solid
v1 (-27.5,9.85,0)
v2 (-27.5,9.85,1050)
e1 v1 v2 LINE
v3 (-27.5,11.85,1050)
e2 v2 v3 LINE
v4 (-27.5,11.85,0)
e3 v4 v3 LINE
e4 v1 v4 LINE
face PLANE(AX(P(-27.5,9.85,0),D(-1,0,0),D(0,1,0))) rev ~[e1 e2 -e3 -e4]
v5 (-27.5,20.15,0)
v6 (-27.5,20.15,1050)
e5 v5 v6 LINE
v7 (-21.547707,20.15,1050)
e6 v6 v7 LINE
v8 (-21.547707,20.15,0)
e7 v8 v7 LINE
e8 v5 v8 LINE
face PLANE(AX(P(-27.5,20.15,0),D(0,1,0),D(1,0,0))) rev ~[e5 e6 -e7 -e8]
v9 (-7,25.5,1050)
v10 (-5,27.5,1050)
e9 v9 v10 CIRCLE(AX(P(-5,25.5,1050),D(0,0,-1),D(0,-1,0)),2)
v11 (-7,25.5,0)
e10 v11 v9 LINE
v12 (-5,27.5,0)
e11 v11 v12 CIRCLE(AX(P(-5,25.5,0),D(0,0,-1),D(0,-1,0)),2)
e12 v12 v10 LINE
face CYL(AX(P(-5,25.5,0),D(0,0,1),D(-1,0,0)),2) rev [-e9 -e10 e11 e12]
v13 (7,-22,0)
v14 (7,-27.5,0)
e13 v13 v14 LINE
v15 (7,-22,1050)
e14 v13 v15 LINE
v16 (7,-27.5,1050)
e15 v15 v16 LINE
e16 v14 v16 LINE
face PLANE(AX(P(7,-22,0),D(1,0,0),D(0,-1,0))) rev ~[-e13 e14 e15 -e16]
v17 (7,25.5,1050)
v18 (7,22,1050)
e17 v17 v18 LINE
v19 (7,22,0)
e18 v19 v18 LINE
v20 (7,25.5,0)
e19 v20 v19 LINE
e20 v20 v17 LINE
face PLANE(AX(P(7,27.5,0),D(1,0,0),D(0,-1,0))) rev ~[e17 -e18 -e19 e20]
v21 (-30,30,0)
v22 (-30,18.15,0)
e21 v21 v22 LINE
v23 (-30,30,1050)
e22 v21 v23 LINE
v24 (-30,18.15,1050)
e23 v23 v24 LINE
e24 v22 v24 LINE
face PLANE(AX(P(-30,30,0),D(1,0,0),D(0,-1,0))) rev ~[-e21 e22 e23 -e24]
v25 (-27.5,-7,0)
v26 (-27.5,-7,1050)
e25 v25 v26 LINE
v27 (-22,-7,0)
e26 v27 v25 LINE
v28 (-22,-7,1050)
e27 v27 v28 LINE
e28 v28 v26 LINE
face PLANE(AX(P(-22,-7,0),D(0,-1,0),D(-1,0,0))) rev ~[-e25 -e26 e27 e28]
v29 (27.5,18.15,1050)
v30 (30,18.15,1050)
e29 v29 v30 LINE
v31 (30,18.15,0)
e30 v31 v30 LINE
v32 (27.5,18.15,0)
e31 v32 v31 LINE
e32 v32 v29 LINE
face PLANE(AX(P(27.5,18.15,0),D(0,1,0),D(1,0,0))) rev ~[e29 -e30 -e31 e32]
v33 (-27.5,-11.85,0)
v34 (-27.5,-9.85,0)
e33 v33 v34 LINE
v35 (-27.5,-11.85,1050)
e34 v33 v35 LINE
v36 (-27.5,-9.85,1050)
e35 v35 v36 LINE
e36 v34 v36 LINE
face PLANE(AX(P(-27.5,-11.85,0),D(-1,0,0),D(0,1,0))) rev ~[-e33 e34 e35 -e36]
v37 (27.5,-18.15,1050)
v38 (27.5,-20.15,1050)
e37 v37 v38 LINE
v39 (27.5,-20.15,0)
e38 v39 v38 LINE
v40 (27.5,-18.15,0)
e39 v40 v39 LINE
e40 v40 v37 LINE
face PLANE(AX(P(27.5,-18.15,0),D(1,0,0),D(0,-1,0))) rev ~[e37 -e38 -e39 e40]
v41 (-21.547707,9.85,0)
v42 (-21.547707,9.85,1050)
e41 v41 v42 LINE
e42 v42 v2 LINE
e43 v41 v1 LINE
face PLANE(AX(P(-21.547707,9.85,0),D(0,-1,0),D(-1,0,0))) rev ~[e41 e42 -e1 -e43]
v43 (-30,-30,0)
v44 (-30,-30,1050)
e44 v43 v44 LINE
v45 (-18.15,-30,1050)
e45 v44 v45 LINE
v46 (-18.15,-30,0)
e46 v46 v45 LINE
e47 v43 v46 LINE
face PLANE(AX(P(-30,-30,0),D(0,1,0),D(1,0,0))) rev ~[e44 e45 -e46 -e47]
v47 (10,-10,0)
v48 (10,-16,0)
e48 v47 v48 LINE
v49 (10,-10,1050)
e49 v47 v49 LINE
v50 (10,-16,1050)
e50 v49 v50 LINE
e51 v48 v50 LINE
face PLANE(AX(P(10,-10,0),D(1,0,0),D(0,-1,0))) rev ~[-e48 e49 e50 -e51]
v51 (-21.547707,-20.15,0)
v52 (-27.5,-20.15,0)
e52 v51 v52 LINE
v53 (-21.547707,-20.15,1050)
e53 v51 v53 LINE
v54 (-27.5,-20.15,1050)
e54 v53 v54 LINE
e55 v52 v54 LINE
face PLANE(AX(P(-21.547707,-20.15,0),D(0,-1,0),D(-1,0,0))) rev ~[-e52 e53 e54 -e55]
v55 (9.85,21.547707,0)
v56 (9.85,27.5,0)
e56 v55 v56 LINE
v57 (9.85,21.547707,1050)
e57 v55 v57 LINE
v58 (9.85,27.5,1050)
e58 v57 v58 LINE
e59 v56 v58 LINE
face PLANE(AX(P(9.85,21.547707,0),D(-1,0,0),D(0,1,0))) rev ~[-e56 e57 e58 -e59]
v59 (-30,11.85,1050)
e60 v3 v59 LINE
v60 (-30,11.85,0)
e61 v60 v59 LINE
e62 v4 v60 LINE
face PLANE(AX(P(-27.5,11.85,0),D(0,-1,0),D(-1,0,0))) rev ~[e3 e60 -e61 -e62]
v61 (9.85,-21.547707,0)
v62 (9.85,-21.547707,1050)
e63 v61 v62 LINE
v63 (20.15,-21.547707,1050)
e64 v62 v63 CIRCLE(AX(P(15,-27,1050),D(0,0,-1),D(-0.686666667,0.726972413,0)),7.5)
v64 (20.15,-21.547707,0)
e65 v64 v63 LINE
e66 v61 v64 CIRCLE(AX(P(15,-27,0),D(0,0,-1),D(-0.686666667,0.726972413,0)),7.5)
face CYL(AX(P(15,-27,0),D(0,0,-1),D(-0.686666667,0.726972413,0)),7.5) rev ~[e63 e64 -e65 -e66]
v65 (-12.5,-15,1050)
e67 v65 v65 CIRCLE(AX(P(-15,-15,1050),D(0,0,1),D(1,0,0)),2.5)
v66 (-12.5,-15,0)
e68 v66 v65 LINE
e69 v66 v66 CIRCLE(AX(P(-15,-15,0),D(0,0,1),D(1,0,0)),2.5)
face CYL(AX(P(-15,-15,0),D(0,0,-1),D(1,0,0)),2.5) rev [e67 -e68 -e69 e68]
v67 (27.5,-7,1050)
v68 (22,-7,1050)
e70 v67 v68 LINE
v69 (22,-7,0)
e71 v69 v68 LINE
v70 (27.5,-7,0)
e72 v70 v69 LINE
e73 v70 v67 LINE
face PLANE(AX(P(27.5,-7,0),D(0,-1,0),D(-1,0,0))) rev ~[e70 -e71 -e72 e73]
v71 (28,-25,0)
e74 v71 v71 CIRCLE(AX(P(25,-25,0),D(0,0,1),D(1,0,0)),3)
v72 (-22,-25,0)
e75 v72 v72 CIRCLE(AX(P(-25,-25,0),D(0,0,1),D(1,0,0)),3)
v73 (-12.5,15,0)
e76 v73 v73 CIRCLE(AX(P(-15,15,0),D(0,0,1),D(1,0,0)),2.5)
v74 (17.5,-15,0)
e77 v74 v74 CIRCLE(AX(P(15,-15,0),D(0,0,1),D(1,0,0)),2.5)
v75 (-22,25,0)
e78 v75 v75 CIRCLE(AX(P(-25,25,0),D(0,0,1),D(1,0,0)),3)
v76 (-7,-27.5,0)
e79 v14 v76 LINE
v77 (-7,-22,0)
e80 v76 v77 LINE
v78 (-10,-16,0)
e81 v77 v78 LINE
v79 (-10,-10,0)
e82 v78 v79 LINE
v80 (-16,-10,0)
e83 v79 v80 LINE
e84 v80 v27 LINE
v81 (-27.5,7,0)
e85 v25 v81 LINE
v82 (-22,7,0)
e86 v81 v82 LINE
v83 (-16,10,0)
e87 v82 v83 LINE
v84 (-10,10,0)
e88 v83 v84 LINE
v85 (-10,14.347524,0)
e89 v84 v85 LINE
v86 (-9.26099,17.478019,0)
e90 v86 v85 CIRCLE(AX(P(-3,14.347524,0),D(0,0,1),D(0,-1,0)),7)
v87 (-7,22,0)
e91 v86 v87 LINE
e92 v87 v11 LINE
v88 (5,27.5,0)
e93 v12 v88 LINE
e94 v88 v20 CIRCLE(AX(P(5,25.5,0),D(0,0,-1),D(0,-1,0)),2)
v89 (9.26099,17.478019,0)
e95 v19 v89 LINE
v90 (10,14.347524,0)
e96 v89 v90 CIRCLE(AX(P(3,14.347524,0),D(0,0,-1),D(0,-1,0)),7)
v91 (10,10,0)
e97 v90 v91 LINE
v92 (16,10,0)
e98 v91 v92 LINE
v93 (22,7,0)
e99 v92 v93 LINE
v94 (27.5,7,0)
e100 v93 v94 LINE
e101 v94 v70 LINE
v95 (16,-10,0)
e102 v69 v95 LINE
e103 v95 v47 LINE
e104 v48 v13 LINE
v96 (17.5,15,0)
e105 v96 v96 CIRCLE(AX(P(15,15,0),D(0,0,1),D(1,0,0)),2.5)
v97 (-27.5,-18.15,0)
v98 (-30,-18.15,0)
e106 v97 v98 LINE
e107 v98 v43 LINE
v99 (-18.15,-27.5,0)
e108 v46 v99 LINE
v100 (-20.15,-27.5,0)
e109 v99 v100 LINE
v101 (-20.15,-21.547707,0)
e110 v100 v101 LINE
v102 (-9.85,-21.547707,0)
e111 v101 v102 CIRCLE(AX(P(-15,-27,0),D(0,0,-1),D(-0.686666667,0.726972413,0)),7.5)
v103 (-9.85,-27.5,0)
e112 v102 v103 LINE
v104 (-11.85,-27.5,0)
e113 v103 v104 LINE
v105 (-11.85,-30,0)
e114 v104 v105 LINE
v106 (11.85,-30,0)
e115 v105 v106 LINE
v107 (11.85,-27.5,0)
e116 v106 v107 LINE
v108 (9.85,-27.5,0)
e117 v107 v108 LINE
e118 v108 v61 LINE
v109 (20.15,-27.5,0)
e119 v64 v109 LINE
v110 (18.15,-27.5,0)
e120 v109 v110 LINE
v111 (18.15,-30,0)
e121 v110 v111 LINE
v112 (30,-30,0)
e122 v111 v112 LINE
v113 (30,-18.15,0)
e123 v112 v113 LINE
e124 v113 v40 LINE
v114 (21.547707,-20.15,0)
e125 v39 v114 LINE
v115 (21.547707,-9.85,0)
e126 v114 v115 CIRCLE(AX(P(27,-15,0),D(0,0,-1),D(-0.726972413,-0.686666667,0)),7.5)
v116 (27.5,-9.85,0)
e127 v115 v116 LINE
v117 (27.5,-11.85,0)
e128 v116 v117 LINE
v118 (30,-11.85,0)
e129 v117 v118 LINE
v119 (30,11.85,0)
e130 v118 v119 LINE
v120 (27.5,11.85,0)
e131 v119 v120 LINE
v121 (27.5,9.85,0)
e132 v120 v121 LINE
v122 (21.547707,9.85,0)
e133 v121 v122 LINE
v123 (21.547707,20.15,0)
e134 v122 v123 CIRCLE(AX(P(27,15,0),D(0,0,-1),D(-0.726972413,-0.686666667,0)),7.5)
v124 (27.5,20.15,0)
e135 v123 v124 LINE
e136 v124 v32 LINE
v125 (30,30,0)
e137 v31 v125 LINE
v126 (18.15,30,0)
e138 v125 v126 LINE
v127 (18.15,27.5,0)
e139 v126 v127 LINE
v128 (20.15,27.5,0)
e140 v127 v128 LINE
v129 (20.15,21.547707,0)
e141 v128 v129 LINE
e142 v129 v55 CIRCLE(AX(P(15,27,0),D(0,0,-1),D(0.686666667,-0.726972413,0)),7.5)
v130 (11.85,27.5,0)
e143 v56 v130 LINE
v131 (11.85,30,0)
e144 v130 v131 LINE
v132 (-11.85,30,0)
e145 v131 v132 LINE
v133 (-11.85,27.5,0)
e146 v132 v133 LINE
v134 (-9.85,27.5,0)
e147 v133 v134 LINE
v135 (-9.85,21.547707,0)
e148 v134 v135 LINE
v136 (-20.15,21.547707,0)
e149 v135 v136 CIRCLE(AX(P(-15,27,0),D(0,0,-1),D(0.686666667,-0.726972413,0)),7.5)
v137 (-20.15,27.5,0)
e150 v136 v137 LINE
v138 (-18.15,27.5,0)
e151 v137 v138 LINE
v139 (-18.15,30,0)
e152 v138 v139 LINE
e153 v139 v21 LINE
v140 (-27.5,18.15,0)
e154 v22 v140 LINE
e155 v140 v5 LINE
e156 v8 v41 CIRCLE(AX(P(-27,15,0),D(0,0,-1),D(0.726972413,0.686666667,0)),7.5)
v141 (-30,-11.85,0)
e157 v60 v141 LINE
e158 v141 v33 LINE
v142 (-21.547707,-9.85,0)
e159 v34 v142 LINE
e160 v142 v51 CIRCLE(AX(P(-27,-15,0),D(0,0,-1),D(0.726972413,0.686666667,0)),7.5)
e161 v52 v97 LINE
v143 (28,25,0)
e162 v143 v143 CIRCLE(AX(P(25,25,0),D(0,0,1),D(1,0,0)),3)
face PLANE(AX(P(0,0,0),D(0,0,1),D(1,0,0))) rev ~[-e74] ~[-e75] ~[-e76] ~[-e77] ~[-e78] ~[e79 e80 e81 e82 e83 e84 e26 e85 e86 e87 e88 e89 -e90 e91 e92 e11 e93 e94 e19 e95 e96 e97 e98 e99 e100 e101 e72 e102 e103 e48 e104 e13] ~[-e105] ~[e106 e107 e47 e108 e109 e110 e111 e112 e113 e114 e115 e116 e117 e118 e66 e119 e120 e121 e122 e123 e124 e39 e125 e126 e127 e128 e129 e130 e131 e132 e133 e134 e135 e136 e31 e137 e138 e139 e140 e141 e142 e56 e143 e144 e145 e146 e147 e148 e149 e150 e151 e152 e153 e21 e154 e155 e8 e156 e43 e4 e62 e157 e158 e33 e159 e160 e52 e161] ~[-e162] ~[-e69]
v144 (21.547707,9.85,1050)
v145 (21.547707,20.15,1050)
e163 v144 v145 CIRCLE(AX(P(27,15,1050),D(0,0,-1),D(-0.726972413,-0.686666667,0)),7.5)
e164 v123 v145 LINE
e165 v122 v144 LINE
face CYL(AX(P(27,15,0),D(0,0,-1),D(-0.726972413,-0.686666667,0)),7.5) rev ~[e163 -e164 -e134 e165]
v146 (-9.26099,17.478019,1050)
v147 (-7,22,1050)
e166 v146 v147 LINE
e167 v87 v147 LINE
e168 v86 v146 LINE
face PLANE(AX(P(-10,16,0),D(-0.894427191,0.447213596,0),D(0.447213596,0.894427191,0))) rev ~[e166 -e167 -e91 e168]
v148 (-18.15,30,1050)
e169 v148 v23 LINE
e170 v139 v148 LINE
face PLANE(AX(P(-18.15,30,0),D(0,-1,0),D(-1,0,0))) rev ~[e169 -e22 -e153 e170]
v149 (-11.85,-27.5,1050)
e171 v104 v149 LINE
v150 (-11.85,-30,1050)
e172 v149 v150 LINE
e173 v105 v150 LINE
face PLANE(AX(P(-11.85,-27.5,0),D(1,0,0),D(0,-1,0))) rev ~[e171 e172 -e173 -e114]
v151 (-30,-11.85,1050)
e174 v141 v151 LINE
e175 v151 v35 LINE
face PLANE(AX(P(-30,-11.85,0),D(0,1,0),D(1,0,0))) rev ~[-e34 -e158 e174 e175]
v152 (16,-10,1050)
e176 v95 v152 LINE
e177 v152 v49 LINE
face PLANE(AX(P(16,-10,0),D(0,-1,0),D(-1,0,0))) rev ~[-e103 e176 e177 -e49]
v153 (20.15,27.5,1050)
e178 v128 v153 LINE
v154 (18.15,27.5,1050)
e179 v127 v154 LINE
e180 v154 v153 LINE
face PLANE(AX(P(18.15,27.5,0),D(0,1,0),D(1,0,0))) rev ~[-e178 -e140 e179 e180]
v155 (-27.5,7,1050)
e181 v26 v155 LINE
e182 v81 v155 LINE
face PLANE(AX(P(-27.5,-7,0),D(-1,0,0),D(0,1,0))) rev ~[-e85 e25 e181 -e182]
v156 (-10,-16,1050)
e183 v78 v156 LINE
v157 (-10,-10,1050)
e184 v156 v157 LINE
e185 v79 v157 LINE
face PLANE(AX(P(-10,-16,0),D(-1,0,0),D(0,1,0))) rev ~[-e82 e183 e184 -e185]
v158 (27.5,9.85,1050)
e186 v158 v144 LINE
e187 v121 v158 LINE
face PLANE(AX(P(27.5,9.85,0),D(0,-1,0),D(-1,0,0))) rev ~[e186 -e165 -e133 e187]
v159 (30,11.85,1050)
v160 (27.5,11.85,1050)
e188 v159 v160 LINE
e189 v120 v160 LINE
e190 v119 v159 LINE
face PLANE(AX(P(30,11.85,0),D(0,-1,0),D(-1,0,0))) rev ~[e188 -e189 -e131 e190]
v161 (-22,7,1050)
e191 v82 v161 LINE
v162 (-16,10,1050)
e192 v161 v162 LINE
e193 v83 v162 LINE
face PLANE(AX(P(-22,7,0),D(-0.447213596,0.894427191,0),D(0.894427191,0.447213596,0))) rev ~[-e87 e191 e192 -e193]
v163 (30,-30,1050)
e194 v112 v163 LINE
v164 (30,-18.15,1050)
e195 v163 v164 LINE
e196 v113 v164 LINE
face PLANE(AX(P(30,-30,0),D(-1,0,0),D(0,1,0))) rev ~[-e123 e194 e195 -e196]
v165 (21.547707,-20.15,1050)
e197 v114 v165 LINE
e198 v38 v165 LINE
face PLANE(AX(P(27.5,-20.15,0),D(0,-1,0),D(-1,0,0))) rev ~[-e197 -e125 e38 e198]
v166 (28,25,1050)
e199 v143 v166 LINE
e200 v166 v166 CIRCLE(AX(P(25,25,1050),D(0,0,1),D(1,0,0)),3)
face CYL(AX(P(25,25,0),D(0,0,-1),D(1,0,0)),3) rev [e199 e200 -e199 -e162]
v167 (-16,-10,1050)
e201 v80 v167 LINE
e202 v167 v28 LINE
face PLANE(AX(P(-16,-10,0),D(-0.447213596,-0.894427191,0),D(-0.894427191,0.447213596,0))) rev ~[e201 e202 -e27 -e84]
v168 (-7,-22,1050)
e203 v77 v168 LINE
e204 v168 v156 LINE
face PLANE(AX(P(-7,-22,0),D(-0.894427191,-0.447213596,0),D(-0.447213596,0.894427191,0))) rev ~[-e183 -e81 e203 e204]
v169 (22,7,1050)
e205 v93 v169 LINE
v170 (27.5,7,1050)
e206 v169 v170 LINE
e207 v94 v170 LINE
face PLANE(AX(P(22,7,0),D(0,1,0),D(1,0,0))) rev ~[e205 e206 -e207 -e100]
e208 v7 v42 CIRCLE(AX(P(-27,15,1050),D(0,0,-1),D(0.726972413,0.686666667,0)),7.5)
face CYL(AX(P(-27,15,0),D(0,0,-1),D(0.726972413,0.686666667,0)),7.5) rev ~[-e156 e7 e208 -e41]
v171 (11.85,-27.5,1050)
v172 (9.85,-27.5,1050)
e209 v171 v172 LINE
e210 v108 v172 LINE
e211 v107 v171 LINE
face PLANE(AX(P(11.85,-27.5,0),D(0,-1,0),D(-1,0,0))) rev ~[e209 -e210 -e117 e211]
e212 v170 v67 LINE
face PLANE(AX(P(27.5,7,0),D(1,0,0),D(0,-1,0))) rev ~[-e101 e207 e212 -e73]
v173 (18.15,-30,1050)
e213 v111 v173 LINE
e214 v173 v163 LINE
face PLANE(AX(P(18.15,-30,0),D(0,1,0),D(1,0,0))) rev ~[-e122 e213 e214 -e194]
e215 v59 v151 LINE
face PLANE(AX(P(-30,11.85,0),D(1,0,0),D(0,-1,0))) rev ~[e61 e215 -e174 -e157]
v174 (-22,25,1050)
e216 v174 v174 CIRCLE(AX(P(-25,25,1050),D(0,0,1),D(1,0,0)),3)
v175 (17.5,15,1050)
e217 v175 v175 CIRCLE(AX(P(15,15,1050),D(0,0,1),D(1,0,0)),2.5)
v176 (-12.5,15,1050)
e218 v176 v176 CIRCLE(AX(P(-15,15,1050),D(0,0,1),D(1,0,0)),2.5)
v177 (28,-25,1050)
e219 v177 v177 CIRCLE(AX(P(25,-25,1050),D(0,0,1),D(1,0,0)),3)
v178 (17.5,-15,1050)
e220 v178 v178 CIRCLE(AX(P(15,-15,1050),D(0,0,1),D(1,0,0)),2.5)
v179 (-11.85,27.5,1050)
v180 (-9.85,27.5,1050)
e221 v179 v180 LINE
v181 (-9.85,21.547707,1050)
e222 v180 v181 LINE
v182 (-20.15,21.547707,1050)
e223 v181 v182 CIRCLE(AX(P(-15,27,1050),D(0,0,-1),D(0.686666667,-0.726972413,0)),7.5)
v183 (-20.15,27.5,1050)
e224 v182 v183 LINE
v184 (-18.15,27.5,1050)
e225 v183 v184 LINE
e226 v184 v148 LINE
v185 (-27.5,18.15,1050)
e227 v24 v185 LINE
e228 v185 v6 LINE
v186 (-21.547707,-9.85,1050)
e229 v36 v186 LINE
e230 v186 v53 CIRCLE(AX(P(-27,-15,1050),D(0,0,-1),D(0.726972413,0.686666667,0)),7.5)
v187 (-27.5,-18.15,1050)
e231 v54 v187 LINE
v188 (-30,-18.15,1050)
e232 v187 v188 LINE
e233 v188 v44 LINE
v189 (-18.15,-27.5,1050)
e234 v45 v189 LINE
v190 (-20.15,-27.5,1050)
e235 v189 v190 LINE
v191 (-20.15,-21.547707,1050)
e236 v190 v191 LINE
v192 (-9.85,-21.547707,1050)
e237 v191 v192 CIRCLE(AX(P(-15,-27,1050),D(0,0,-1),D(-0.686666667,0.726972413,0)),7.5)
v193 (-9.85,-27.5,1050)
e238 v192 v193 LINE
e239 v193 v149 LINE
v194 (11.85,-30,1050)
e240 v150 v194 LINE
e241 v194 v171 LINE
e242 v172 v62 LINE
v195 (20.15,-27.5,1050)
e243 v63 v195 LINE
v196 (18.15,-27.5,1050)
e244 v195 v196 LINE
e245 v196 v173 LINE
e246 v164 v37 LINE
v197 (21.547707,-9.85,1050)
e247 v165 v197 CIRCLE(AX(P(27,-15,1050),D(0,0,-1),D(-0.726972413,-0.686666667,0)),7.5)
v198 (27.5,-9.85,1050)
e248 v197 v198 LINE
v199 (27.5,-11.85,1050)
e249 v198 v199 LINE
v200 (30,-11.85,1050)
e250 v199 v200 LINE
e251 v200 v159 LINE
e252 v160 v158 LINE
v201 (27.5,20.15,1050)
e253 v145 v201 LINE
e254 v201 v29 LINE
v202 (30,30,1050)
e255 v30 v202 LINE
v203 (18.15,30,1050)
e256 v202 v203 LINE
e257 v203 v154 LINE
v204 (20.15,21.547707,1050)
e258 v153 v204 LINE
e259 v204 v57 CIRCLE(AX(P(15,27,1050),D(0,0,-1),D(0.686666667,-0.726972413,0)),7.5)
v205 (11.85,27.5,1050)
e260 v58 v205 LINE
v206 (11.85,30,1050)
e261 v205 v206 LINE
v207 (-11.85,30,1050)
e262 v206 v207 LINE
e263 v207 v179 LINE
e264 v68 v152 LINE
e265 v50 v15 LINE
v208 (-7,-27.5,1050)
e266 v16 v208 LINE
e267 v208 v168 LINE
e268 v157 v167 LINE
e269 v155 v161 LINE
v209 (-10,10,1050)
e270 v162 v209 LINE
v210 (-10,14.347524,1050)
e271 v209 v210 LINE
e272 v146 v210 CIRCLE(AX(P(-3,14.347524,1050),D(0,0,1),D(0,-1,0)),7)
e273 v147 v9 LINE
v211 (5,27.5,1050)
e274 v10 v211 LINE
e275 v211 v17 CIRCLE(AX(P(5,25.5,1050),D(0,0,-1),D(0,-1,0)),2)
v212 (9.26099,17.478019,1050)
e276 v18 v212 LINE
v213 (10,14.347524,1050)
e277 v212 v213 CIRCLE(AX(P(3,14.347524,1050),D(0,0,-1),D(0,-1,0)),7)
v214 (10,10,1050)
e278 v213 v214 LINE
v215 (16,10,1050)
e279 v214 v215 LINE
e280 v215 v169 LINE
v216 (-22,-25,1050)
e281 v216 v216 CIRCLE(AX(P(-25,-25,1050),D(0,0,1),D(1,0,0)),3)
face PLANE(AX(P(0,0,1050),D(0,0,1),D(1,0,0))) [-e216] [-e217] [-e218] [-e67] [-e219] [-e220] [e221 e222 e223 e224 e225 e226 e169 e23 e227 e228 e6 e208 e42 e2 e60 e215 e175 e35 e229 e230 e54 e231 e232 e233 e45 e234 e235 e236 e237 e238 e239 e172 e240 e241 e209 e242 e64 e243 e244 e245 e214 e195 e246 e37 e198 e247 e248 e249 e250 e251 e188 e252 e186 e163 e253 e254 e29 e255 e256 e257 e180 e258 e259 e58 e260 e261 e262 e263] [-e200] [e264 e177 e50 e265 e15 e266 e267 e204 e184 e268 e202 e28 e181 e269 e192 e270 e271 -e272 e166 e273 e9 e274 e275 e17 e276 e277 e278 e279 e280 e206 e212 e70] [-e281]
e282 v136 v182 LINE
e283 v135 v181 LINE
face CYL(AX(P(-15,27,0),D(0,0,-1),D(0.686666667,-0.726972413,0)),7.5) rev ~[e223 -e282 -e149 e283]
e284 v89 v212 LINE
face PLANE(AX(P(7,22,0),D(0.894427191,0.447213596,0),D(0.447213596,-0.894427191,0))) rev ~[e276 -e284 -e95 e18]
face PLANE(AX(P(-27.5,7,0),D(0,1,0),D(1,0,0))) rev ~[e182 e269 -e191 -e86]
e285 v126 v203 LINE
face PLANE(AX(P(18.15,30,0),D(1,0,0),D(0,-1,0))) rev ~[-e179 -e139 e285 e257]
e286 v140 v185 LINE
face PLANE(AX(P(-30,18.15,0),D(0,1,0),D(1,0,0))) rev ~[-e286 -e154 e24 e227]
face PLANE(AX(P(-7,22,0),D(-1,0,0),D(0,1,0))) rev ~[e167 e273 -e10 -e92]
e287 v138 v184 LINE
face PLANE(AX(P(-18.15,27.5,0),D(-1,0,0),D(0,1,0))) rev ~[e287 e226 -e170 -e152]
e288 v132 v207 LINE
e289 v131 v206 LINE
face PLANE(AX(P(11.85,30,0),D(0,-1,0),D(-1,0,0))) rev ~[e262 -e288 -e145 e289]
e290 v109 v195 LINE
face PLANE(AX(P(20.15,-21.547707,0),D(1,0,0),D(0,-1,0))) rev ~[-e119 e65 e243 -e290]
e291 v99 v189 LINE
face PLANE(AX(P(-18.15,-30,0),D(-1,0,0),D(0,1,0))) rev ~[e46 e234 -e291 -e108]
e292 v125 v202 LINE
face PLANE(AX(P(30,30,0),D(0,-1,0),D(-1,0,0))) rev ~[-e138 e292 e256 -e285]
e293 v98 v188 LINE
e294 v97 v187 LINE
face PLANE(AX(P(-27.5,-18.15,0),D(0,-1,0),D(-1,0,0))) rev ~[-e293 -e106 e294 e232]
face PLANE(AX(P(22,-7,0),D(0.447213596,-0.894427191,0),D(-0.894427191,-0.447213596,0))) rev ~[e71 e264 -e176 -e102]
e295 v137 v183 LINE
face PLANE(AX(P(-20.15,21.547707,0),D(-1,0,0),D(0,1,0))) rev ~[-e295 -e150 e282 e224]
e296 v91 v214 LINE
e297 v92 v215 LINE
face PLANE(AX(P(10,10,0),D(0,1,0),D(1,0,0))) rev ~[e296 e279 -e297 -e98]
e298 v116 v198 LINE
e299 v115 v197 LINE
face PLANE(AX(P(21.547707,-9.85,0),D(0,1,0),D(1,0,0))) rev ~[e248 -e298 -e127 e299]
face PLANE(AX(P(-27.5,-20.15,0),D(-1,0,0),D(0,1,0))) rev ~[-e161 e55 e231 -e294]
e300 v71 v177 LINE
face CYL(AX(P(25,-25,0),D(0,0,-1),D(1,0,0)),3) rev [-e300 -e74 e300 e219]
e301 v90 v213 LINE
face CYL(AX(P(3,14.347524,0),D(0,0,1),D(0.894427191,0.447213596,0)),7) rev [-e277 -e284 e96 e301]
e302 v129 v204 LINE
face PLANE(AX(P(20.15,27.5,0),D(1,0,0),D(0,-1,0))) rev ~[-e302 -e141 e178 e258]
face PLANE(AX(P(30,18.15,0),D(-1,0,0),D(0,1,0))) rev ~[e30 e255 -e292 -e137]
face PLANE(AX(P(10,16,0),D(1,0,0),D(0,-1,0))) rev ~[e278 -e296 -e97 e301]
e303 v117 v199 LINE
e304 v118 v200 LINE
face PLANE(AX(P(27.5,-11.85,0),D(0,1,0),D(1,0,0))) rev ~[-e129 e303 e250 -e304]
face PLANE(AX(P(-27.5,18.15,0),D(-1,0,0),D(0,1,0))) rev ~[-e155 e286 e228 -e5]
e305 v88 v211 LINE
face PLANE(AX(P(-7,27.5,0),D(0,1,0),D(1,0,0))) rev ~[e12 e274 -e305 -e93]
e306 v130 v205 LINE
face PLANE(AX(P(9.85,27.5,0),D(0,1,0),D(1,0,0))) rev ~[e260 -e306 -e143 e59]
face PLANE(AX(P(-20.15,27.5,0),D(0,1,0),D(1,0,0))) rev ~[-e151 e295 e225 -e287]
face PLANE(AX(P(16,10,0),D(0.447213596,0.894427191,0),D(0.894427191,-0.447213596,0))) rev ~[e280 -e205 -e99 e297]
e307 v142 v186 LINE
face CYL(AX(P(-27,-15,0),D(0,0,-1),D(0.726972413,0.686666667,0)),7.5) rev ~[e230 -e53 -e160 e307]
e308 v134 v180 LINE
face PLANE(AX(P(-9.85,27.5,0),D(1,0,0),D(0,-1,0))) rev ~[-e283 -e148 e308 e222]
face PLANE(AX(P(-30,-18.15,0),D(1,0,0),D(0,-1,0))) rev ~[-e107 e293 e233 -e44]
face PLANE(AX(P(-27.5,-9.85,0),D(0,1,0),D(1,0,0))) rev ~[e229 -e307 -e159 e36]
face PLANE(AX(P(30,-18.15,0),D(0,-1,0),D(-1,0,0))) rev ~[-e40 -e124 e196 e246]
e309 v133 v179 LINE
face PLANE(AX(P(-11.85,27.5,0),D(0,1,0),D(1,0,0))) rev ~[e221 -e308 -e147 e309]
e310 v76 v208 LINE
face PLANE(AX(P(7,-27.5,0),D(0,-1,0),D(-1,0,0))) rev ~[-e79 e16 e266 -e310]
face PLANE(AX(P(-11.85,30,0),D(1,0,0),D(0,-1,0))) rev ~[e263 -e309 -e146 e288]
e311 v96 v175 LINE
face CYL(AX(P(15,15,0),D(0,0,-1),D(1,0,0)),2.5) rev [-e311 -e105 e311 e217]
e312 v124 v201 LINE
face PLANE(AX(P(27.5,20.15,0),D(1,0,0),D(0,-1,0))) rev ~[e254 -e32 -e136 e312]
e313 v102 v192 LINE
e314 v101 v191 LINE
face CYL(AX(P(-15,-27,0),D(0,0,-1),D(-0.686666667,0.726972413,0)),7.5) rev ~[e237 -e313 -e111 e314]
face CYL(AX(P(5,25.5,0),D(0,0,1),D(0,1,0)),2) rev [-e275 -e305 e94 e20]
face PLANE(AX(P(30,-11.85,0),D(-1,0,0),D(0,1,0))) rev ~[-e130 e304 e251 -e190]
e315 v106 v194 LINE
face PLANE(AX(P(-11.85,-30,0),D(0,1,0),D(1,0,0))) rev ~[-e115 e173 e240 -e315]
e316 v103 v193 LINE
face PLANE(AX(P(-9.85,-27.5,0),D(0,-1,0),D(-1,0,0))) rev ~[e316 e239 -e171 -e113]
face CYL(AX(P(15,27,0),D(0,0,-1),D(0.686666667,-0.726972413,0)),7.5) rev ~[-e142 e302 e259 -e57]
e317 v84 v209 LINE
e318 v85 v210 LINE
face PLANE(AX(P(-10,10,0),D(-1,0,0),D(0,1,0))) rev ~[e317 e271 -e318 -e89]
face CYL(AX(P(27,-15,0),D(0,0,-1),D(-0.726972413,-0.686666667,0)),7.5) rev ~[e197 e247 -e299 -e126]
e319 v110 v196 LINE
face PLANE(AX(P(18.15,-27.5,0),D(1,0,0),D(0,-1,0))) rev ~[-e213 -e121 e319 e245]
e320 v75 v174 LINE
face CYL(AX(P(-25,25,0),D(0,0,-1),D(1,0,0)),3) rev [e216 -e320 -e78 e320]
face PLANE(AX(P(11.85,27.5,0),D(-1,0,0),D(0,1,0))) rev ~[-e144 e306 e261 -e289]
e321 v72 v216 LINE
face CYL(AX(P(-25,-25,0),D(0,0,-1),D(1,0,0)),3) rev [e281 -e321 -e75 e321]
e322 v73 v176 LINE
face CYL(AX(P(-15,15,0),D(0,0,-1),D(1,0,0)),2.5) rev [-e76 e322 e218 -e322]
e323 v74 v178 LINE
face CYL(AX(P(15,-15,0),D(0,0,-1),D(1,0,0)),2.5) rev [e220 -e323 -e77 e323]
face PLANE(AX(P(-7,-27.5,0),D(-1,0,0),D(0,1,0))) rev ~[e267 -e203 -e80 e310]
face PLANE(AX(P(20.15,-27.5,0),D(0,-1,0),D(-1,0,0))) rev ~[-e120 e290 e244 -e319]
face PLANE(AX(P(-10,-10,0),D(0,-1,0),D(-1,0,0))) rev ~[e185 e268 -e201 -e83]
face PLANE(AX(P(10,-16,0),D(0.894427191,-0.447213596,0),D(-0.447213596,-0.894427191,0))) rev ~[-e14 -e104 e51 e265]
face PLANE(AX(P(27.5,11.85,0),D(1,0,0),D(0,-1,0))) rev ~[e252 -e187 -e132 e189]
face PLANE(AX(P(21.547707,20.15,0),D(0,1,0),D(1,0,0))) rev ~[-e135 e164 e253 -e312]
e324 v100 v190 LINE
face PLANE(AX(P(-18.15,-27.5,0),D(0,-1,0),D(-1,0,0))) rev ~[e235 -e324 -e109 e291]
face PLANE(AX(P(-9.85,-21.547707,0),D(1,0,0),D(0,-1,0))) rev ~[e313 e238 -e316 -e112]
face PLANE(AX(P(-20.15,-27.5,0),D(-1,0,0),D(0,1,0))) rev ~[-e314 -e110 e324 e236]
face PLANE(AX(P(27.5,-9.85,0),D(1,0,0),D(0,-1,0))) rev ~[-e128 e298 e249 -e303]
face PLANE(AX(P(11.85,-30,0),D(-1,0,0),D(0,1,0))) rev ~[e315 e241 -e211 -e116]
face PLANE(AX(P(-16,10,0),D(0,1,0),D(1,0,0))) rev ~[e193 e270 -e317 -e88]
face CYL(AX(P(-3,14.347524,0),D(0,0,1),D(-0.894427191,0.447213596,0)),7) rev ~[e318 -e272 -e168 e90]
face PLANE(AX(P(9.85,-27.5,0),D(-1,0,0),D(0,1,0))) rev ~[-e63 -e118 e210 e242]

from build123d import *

# Parameters (mm, degrees)
F0_R     = 3
F0_R_2   = 2.5
F1_DEPTH = 1050
F2_R     = 2
F3_R     = 7


# Not quite as in the source:
# - a feature names something its author has since deleted; it is built from what else it names


with BuildPart() as f1:
    # F0 (on Top) → F1 (new body)
    with BuildSketch(Plane.XY):
        with BuildLine():
            Line((18.15, -30), (30, -30))
            Line((30, -30), (30, -18.15))
            Line((30, -18.15), (27.5, -18.15))
            Line((27.5, -18.15), (27.5, -20.15))
            Line((27.5, -20.15), (21.5477069044, -20.15))
            ThreePointArc((21.5477069044, -20.15), (19.5, -15), (21.5477069044, -9.85))
            Line((21.5477069044, -9.85), (27.5, -9.85))
            Line((27.5, -9.85), (27.5, -11.85))
            Line((27.5, -11.85), (30, -11.85))
            Line((30, -11.85), (30, 11.85))
            Line((30, 11.85), (27.5, 11.85))
            Line((27.5, 11.85), (27.5, 9.85))
            Line((27.5, 9.85), (21.5477069044, 9.85))
            ThreePointArc((21.5477069044, 9.85), (19.5, 15), (21.5477069044, 20.15))
            Line((21.5477069044, 20.15), (27.5, 20.15))
            Line((27.5, 20.15), (27.5, 18.15))
            Line((27.5, 18.15), (30, 18.15))
            Line((30, 18.15), (30, 30))
            Line((30, 30), (18.15, 30))
            Line((18.15, 30), (18.15, 27.5))
            Line((18.15, 27.5), (20.15, 27.5))
            Line((20.15, 27.5), (20.15, 21.5477069044))
            ThreePointArc((20.15, 21.5477069044), (15, 19.5), (9.85, 21.5477069044))
            Line((9.85, 21.5477069044), (9.85, 27.5))
            Line((9.85, 27.5), (11.85, 27.5))
            Line((11.85, 27.5), (11.85, 30))
            Line((11.85, 30), (-11.85, 30))
            Line((-11.85, 30), (-11.85, 27.5))
            Line((-11.85, 27.5), (-9.85, 27.5))
            Line((-9.85, 27.5), (-9.85, 21.5477069044))
            ThreePointArc((-9.85, 21.5477069044), (-15, 19.5), (-20.15, 21.5477069044))
            Line((-20.15, 21.5477069044), (-20.15, 27.5))
            Line((-20.15, 27.5), (-18.15, 27.5))
            Line((-18.15, 27.5), (-18.15, 30))
            Line((-18.15, 30), (-30, 30))
            Line((-30, 30), (-30, 18.15))
            Line((-30, 18.15), (-27.5, 18.15))
            Line((-27.5, 18.15), (-27.5, 20.15))
            Line((-27.5, 20.15), (-21.5477069044, 20.15))
            ThreePointArc((-21.5477069044, 20.15), (-19.5, 15), (-21.5477069044, 9.85))
            Line((-21.5477069044, 9.85), (-27.5, 9.85))
            Line((-27.5, 9.85), (-27.5, 11.85))
            Line((-27.5, 11.85), (-30, 11.85))
            Line((-30, 11.85), (-30, -11.85))
            Line((-30, -11.85), (-27.5, -11.85))
            Line((-27.5, -11.85), (-27.5, -9.85))
            Line((-27.5, -9.85), (-21.5477069044, -9.85))
            ThreePointArc((-21.5477069044, -9.85), (-19.5, -15), (-21.5477069044, -20.15))
            Line((-21.5477069044, -20.15), (-27.5, -20.15))
            Line((-27.5, -20.15), (-27.5, -18.15))
            Line((-27.5, -18.15), (-30, -18.15))
            Line((-30, -18.15), (-30, -30))
            Line((-30, -30), (-18.15, -30))
            Line((-18.15, -30), (-18.15, -27.5))
            Line((-18.15, -27.5), (-20.15, -27.5))
            Line((-20.15, -27.5), (-20.15, -21.5477069044))
            ThreePointArc((-20.15, -21.5477069044), (-15, -19.5), (-9.85, -21.5477069044))
            Line((-9.85, -21.5477069044), (-9.85, -27.5))
            Line((-9.85, -27.5), (-11.85, -27.5))
            Line((-11.85, -27.5), (-11.85, -30))
            Line((-11.85, -30), (11.85, -30))
            Line((11.85, -30), (11.85, -27.5))
            Line((11.85, -27.5), (9.85, -27.5))
            Line((9.85, -27.5), (9.85, -21.5477069044))
            ThreePointArc((9.85, -21.5477069044), (15, -19.5), (20.15, -21.5477069044))
            Line((20.15, -21.5477069044), (20.15, -27.5))
            Line((20.15, -27.5), (18.15, -27.5))
            Line((18.15, -27.5), (18.15, -30))
        make_face()
        with Locations((-25, -25)):
            Circle(F0_R, mode=Mode.SUBTRACT)
        with Locations((-15, -15)):
            Circle(F0_R_2, mode=Mode.SUBTRACT)
        with Locations((25, -25)):
            Circle(F0_R, mode=Mode.SUBTRACT)
        with Locations((15, -15)):
            Circle(F0_R_2, mode=Mode.SUBTRACT)
        with Locations((-25, 25)):
            Circle(F0_R, mode=Mode.SUBTRACT)
        with Locations((-15, 15)):
            Circle(F0_R_2, mode=Mode.SUBTRACT)
        Polygon((-7, 22), (-7, 27.5), (0, 27.5), (7, 27.5), (7, 22), (10, 16), (10, 10), (16, 10), (22, 7), (27.5, 7), (27.5, 0), (27.5, -7), (22, -7), (16, -10), (10, -10), (10, -16), (7, -22), (7, -27.5), (0, -27.5), (-7, -27.5), (-7, -22), (-10, -16), (-10, -10), (-16, -10), (-22, -7), (-27.5, -7), (-27.5, 0), (-27.5, 7), (-22, 7), (-16, 10), (-10, 10), (-10, 16), align=None, mode=Mode.SUBTRACT)
        with Locations((15, 15)):
            Circle(F0_R_2, mode=Mode.SUBTRACT)
        with Locations((25, 25)):
            Circle(F0_R, mode=Mode.SUBTRACT)
    extrude(amount=F1_DEPTH)

    # F2
    f2_edges = [f1.edges().sort_by_distance(p)[0] for p in [
        (-7, 27.5, 525),
        (7, 27.5, 525),
    ]]
    fillet(f2_edges, radius=F2_R)

    # F3
    f3_edges = [f1.edges().sort_by_distance(p)[0] for p in [
        (-10, 16, 525),
        (10, 16, 525),
    ]]
    fillet(f3_edges, radius=F3_R)


solid = f1.part
